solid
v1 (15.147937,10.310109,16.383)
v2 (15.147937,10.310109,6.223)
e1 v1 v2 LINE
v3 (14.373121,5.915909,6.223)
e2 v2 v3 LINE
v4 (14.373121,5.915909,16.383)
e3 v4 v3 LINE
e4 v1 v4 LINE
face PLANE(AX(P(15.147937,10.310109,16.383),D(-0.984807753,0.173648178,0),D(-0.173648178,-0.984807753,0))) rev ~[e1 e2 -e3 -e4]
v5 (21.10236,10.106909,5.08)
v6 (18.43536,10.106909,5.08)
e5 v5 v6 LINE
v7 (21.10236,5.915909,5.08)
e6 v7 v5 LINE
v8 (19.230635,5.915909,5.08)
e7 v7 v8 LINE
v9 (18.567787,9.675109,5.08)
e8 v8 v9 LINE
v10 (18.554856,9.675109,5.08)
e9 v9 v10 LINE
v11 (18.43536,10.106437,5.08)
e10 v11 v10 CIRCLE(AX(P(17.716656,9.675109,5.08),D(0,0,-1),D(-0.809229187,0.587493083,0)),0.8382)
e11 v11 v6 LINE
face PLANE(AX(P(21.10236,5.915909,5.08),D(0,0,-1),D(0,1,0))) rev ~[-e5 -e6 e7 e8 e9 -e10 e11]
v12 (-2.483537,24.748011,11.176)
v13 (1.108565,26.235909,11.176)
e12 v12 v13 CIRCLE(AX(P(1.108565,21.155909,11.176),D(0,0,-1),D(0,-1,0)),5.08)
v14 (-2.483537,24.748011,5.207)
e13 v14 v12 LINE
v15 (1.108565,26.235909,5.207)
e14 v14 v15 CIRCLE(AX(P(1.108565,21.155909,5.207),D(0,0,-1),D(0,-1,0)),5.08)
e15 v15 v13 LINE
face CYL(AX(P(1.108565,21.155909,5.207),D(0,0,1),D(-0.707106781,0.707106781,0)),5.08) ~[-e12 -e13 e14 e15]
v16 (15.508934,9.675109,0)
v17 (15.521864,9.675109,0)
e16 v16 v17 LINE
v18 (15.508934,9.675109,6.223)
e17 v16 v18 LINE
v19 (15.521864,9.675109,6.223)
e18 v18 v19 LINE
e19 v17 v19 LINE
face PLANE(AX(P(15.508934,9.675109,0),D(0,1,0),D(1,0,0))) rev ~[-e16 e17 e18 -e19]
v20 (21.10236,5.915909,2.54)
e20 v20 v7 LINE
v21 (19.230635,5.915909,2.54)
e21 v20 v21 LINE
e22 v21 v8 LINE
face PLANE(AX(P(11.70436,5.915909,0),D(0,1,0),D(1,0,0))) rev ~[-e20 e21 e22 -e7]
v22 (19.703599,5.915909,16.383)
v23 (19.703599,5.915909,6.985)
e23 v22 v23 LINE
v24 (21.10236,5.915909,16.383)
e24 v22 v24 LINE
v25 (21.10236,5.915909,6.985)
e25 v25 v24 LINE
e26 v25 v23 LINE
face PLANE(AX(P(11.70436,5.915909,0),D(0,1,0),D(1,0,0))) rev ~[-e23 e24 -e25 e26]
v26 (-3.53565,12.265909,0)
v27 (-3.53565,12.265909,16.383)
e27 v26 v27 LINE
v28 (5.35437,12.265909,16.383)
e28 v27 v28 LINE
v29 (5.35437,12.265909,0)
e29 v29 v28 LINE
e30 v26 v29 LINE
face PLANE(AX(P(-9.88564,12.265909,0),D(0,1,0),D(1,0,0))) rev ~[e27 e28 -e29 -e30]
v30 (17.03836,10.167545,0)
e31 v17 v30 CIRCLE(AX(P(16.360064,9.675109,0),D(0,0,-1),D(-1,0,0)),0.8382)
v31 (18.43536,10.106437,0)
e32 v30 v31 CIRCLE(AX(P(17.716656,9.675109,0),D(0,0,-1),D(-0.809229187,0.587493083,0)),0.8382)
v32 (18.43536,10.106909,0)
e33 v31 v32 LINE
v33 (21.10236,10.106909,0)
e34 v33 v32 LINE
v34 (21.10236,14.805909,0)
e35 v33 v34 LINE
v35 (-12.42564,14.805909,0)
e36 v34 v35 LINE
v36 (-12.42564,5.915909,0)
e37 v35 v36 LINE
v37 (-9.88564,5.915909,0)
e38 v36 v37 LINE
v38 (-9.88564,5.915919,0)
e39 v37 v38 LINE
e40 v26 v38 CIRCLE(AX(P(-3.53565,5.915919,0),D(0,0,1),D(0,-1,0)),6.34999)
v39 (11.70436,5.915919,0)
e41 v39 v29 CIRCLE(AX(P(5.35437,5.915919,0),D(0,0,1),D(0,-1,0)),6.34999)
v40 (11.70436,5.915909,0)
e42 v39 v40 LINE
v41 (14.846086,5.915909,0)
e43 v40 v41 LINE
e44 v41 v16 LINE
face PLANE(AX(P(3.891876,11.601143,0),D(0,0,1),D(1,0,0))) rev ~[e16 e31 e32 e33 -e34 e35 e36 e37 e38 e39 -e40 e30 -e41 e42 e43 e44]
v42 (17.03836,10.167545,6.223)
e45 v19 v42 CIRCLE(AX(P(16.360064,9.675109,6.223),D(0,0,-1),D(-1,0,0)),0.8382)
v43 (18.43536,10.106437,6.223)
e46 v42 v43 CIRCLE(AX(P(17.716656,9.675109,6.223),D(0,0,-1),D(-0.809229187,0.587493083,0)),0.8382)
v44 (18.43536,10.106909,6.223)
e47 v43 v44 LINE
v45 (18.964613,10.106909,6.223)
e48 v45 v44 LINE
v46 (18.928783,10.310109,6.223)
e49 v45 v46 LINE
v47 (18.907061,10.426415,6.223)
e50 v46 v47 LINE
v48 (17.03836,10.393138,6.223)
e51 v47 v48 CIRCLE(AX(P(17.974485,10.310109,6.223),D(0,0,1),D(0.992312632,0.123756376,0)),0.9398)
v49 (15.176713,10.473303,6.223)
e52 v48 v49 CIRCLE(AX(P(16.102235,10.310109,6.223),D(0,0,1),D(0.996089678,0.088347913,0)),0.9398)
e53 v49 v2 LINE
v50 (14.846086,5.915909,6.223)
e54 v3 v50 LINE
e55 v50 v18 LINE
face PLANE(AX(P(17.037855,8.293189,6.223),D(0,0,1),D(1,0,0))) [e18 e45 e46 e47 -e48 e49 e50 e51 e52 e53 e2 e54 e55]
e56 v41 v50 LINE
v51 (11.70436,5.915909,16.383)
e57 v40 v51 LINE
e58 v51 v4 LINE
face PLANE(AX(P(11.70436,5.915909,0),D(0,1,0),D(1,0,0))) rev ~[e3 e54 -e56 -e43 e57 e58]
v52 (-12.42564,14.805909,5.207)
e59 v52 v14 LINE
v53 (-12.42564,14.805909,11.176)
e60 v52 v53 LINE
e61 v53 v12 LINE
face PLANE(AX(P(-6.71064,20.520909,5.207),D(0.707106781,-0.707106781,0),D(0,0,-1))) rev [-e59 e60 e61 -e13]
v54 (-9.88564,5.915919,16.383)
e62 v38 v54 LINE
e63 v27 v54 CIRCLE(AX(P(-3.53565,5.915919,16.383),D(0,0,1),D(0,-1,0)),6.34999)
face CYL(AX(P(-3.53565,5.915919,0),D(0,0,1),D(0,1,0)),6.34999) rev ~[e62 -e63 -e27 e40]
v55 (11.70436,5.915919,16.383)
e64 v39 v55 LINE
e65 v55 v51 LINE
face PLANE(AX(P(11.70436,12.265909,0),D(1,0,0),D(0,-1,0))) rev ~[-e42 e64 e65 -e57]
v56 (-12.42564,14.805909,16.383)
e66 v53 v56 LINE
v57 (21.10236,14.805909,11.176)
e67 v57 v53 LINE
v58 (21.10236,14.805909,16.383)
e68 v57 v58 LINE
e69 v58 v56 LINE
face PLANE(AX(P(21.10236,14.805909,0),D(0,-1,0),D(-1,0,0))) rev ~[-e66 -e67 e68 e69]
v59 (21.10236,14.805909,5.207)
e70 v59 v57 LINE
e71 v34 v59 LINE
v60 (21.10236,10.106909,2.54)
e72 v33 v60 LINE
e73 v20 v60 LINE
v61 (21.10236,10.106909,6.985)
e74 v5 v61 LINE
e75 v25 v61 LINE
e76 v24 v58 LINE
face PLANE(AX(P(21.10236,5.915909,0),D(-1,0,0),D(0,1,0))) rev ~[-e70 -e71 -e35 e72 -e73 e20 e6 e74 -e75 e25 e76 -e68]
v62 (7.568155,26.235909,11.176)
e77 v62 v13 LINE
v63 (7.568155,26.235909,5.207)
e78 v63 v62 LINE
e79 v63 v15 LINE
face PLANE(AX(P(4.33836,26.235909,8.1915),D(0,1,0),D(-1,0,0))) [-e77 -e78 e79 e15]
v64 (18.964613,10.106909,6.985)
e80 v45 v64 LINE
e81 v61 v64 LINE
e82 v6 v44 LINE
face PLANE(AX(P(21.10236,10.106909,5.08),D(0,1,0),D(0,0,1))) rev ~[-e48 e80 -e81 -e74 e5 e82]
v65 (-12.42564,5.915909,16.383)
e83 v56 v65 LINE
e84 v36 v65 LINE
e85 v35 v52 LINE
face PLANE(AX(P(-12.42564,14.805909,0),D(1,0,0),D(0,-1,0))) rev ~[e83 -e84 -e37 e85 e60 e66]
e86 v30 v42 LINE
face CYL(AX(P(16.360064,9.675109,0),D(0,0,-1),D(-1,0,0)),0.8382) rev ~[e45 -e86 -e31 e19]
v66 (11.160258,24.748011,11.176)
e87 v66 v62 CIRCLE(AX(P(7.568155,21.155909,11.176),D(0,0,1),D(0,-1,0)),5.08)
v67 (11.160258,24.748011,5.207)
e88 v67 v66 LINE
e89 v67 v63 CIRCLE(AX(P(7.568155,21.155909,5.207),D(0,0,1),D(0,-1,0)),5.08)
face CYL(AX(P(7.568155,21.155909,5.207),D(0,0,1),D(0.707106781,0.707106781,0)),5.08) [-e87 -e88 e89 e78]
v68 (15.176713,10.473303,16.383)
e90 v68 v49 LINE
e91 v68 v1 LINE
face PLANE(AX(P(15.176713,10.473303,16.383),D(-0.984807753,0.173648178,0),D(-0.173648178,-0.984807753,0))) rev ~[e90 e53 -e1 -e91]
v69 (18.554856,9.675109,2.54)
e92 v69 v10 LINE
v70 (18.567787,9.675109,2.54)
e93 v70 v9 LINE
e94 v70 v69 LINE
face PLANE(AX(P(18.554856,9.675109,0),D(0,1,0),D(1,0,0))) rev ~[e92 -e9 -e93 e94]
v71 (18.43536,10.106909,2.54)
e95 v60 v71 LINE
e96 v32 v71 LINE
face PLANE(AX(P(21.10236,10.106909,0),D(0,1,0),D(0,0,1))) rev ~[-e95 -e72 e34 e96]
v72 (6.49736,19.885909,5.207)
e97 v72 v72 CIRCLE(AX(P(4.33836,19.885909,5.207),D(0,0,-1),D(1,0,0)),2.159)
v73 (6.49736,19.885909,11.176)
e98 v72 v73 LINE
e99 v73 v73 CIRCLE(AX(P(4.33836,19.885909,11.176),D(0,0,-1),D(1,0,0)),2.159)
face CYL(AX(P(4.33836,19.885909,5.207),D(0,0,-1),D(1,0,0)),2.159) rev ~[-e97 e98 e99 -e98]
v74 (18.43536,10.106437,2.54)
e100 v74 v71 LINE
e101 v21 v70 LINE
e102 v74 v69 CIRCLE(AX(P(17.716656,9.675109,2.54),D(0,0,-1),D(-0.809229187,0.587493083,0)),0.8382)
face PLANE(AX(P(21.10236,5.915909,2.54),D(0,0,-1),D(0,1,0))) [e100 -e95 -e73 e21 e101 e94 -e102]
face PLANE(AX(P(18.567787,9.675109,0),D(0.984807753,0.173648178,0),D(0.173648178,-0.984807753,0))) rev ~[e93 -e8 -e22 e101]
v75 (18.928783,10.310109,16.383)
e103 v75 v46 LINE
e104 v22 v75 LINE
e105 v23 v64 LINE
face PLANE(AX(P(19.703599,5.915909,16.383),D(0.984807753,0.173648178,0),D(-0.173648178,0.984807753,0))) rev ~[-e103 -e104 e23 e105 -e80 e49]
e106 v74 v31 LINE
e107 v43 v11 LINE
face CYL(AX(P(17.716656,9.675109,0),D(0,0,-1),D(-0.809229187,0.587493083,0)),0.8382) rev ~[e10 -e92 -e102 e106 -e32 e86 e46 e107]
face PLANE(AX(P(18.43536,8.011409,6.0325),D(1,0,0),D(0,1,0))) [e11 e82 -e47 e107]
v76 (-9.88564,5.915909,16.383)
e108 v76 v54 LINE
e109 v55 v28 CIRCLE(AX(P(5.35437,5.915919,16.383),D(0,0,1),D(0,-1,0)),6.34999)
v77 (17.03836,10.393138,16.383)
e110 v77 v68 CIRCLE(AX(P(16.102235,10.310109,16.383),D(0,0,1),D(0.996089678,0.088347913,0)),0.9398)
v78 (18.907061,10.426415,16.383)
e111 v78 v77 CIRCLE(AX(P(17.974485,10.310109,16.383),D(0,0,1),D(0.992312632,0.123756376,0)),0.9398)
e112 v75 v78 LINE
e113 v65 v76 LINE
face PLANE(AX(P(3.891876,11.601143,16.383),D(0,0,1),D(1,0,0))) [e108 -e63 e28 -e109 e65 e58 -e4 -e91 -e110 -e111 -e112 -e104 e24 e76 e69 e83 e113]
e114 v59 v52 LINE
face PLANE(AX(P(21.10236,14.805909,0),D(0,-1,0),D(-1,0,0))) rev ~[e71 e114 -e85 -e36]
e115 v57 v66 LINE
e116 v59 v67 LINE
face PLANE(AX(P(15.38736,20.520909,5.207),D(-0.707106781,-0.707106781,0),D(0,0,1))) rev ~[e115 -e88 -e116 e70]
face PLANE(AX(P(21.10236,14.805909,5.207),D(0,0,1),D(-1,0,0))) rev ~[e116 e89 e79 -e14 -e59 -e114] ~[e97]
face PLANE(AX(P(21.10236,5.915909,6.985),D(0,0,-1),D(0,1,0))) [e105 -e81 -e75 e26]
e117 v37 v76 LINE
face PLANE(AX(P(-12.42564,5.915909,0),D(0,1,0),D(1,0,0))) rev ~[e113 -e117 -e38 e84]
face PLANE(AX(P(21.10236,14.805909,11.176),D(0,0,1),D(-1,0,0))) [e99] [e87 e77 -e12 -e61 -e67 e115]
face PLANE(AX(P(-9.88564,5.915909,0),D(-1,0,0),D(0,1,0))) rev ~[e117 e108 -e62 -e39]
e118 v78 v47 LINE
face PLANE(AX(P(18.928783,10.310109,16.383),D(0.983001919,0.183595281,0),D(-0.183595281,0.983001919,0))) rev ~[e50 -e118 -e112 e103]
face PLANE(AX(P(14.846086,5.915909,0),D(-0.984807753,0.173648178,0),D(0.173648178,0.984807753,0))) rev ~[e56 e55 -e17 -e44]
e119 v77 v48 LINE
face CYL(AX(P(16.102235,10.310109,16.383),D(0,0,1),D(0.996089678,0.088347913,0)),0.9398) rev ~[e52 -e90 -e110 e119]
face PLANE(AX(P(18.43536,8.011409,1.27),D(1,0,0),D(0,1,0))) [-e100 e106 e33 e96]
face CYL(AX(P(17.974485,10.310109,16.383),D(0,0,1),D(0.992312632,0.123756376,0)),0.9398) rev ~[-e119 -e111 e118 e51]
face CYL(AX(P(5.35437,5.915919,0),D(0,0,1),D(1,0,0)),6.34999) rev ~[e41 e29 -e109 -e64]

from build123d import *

# Parameters (mm, degrees)
F1_DEPTH  = 16.383
F2_W      = 33.528
F2_H      = 5.969
F3_DEPTH  = 11.43
F4_SIZE   = 11.43
F5_R      = 2.159
F6_DEPTH  = 25.4
F8_DEPTH  = 6.35
F10_DEPTH = 10.16
F11_R     = 6.34999
F12_W     = 4.191
F12_H     = 2.54
F12_H_2   = 1.905
F13_DEPTH = 2.667
F14_R     = 5.08


# Not quite as in the source:
# - a fillet or chamfer is up to 0.001 mm smaller than in the source, because OpenCascade refuses the exact size


with BuildPart() as f1:
    # F0 (on Top) → F1 (new body)
    with BuildSketch(Plane.XY):
        Polygon((21.1023603916, 14.8059087365), (-12.4256396084, 14.8059087365), (-12.4256396084, 5.9159087365), (-9.8856396084, 5.9159087365), (-9.8856396084, 12.2659087365), (11.7043603916, 12.2659087365), (11.7043603916, 5.9159087365), (21.1023603916, 5.9159087365), align=None)
    extrude(amount=F1_DEPTH)

    # F2 (on face) → F3 (join)
    with BuildSketch(Plane(origin=(0, 14.8059087365, 0), x_dir=(-1, 0, 0), z_dir=(0, 1, 0))):
        with Locations((-4.3383603916, 8.1915)):
            Rectangle(F2_W, F2_H)
    extrude(amount=F3_DEPTH)

    # F4
    f4_edges = [f1.edges().sort_by_distance(p)[0] for p in [
        (-12.42564, 26.235909, 8.1915),
        (21.10236, 26.235909, 8.1915),
    ]]
    chamfer(f4_edges, length=F4_SIZE)

    # F5 (on face) → F6 (cut)
    with BuildSketch(Plane(origin=(0, 0, 5.207), x_dir=(1, 0, 0), z_dir=(0, 0, -1))):
        with Locations((4.3383603916, -19.8859087365)):
            Circle(F5_R)
    extrude(amount=-F6_DEPTH, mode=Mode.SUBTRACT)

    # F7 (on face) → F8 (cut)
    with BuildSketch(Plane(origin=(0, 0, 0), x_dir=(1, 0, 0), z_dir=(0, 0, -1))):
        with BuildLine():
            Line((18.5677868823, -9.6751087365), (19.2306352681, -5.9159087365))
            Line((19.2306352681, -5.9159087365), (14.846085515, -5.9159087365))
            Line((14.846085515, -5.9159087365), (15.5089339009, -9.6751087365))
            Line((15.5089339009, -9.6751087365), (15.5218644869, -9.6751087365))
            ThreePointArc((15.5218644869, -9.6751087365), (16.101190374, -10.4723310604), (17.0383603916, -10.1675454388))
            ThreePointArc((17.0383603916, -10.1675454388), (17.9755304092, -10.4723310604), (18.5548562962, -9.6751087365))
            Line((18.5548562962, -9.6751087365), (18.5677868823, -9.6751087365))
        make_face()
    extrude(amount=-F8_DEPTH, mode=Mode.SUBTRACT)

    # F9 (on face) → F10 (cut)
    with BuildSketch(Plane.XY.offset(16.383)):
        with BuildLine():
            Line((14.3731213639, 5.9159087365), (19.7035994193, 5.9159087365))
            Line((19.7035994193, 5.9159087365), (18.9287834006, 10.3101087365))
            Line((18.9287834006, 10.3101087365), (18.9070608822, 10.4264149788))
            ThreePointArc((18.9070608822, 10.4264149788), (17.9577526403, 11.2497597634), (17.0383603916, 10.3931381052))
            ThreePointArc((17.0383603916, 10.3931381052), (16.1426669703, 11.2490386173), (15.1767129861, 10.4733032939))
            Line((15.1767129861, 10.4733032939), (15.1479373825, 10.3101087365))
            Line((15.1479373825, 10.3101087365), (14.3731213639, 5.9159087365))
        make_face()
    extrude(amount=-F10_DEPTH, mode=Mode.SUBTRACT)

    # F11 (radius 6.35 in the source; OpenCascade refuses exactly that, so slightly less here)
    f11_edges = [f1.edges().sort_by_distance(p)[0] for p in [
        (11.70436, 12.265909, 8.1915),
        (-9.88564, 12.265909, 8.1915),
    ]]
    fillet(f11_edges, radius=F11_R)

    # F12 (on face) → F13 (cut)
    with BuildSketch(Plane.YZ.offset(21.1023603916)):
        with Locations((8.0114087365, 1.27)):
            Rectangle(F12_W, F12_H)
        with Locations((8.0114087365, 6.0325)):
            Rectangle(F12_W, F12_H_2)
    extrude(amount=-F13_DEPTH, mode=Mode.SUBTRACT)

    # F14
    f14_edges = [f1.edges().sort_by_distance(p)[0] for p in [
        (9.67236, 26.235909, 8.1915),
        (-0.99564, 26.235909, 8.1915),
    ]]
    fillet(f14_edges, radius=F14_R)


solid = f1.part
